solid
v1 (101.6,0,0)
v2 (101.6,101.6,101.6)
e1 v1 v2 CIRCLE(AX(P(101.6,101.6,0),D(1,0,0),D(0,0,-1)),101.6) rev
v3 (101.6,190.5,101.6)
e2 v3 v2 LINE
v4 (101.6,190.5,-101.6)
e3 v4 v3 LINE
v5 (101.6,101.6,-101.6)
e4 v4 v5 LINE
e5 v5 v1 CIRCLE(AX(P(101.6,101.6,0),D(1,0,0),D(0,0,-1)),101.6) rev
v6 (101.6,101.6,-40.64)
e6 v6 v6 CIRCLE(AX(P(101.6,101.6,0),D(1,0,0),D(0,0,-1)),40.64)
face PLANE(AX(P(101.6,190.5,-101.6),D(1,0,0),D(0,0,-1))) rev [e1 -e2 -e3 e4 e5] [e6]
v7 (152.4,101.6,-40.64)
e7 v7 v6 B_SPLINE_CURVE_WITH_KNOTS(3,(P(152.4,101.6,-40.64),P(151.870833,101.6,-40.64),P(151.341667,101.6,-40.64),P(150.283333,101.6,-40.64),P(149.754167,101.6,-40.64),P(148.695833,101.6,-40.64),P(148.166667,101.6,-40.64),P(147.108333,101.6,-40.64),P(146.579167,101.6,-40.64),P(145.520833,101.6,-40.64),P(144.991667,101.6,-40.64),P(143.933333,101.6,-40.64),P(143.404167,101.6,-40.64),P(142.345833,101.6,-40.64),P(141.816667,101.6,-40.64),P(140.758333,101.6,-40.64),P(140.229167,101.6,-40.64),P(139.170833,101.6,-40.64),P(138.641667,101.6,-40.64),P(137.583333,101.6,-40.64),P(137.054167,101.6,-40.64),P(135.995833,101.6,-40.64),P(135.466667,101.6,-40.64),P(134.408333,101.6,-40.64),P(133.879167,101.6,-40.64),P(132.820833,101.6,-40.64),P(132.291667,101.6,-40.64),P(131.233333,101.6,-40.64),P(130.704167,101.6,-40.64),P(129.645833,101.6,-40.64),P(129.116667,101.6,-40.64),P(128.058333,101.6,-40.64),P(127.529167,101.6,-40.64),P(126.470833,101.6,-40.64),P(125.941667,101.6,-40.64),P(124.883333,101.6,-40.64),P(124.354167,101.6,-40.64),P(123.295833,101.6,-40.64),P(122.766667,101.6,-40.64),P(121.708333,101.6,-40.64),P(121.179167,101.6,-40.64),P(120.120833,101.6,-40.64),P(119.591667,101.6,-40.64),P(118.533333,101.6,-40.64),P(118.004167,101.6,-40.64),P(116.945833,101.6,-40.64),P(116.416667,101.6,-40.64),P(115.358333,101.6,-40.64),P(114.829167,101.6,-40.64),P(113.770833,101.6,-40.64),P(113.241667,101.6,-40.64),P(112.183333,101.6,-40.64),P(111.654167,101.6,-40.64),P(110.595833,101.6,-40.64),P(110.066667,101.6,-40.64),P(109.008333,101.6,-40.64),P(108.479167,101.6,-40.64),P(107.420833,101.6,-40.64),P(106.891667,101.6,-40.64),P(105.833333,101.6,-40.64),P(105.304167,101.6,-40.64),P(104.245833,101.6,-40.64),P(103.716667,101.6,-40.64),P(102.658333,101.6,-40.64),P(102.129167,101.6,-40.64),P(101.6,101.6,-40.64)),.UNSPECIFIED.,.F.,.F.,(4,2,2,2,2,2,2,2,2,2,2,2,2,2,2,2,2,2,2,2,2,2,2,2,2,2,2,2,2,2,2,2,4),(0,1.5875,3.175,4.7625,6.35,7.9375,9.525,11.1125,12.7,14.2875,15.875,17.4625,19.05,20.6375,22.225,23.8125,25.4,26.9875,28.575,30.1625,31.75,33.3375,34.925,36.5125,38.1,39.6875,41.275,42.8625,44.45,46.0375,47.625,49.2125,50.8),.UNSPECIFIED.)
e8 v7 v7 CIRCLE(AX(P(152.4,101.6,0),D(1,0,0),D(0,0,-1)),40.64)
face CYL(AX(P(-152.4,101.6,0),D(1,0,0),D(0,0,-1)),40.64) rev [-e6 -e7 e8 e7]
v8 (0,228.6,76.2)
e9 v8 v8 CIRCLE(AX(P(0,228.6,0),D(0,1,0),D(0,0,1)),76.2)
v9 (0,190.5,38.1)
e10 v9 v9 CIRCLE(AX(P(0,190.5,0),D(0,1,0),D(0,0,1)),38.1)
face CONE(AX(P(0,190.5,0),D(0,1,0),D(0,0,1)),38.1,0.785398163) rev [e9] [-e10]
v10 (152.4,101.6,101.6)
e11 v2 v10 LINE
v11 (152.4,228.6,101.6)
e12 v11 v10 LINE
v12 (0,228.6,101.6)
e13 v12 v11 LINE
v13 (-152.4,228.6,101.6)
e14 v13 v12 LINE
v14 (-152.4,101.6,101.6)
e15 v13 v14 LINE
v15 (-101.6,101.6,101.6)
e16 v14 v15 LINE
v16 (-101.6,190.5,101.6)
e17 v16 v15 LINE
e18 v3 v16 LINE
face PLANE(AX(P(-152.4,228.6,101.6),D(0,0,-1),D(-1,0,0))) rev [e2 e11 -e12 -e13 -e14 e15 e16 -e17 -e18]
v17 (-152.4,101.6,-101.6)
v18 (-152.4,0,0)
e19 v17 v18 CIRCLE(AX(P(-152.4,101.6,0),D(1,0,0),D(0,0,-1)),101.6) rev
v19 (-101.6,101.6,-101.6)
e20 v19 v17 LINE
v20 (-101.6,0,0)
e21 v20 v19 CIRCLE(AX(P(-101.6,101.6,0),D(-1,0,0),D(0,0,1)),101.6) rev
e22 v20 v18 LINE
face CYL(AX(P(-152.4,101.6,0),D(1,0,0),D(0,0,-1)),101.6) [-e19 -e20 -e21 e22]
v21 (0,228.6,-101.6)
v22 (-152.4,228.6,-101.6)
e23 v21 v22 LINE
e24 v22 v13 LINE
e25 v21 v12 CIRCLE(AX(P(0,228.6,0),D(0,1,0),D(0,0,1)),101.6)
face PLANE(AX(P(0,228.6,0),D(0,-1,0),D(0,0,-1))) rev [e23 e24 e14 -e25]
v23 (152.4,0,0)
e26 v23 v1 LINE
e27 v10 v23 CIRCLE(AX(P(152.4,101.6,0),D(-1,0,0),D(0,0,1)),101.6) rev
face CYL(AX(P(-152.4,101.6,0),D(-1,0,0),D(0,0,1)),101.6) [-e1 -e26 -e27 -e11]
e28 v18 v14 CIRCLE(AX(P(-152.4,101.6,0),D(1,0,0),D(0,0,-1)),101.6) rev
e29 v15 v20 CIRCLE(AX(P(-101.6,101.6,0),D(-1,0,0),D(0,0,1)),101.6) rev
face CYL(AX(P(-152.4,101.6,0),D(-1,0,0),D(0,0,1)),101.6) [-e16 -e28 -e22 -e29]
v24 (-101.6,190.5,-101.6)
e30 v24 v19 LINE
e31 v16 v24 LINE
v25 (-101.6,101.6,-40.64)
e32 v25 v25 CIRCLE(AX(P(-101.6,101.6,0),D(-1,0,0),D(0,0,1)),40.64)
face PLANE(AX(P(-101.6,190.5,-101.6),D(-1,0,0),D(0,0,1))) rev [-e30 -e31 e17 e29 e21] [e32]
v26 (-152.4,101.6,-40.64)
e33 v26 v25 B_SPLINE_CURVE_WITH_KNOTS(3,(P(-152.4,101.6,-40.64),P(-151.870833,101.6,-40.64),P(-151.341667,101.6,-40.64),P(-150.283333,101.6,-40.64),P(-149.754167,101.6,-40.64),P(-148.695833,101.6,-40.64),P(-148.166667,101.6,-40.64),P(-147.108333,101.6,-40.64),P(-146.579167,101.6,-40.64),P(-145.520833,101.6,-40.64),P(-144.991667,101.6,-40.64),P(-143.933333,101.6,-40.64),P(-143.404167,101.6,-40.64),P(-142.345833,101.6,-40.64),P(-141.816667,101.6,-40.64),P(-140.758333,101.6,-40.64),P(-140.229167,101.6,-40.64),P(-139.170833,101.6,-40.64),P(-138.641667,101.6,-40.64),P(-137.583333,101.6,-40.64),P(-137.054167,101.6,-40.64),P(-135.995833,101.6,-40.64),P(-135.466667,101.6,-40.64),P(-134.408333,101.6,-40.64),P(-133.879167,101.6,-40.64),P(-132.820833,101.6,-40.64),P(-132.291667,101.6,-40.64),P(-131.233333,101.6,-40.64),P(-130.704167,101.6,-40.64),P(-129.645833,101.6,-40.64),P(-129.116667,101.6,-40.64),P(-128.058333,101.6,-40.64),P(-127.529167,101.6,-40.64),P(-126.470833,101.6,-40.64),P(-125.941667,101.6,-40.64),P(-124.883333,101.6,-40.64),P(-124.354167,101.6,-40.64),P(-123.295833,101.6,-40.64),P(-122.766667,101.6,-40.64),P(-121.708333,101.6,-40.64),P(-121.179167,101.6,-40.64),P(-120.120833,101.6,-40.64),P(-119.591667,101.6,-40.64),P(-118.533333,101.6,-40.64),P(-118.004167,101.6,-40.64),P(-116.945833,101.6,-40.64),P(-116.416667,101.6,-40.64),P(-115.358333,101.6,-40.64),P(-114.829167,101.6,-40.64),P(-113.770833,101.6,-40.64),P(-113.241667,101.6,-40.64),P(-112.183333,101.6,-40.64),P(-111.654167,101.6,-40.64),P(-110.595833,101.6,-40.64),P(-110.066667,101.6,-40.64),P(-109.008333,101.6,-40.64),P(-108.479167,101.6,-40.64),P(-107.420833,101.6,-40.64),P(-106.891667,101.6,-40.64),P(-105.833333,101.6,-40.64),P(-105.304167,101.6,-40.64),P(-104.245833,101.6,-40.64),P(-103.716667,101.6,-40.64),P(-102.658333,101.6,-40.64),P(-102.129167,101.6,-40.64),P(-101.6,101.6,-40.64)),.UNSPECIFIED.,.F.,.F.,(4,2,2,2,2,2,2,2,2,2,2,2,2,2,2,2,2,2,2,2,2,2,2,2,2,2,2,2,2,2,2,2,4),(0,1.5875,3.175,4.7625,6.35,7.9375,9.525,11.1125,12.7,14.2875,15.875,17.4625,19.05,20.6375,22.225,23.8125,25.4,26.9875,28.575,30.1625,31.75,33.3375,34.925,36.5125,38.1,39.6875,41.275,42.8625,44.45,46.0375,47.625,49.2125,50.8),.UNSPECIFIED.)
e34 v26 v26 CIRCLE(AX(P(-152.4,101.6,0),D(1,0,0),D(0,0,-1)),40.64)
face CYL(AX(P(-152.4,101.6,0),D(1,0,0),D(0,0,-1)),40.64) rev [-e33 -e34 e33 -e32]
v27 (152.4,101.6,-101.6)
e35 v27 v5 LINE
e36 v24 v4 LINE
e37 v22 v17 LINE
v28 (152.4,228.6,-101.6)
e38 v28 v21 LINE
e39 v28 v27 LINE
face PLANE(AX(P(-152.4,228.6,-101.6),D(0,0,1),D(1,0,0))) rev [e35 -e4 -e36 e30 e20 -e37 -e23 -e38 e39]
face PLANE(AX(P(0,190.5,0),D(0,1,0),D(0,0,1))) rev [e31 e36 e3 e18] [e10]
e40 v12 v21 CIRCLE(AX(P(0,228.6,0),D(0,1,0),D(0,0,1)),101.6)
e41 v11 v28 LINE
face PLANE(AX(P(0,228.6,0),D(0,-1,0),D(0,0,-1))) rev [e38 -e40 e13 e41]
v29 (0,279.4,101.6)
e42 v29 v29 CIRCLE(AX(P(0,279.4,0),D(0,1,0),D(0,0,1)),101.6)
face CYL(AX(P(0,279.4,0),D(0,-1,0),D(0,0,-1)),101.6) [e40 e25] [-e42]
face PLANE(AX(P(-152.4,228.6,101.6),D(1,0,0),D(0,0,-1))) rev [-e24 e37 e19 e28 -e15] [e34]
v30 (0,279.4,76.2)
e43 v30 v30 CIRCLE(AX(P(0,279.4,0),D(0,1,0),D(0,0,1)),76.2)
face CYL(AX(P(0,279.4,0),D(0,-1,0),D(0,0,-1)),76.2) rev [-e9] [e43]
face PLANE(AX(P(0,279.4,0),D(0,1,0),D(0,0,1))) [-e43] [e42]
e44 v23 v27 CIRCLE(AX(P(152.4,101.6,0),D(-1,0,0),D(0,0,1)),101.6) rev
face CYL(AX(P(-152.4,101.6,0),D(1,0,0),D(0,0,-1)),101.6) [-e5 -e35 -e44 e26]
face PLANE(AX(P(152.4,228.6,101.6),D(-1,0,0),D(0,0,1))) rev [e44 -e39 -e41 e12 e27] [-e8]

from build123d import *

# Parameters (mm, degrees)
SKETCH1_W           = 304.8
SKETCH1_H           = 203.2
BOSS_EXTRUDE1_DEPTH = 228.6
SKETCH2_R           = 101.6
SKETCH2_R_2         = 76.2
BOSS_EXTRUDE2_DEPTH = 50.8
SKETCH3_R           = 38.1
CUT_EXTRUDE1_DEPTH  = 38.1
SKETCH4_W           = 203.2
SKETCH4_H           = 203.2
CUT_EXTRUDE2_DEPTH  = 190.5
SKETCH5_R           = 40.64
CUT_EXTRUDE3_DEPTH  = 304.8
FILLET1_R           = 101.6
CHAMFER1_SIZE       = 38.1


with BuildPart() as part:
    # Sketch1 → Boss-Extrude1 (new body)
    with BuildSketch(Plane(origin=(0, 0, 0), x_dir=(1, 0, 0), z_dir=(0, 1, 0))):
        Rectangle(SKETCH1_W, SKETCH1_H)
    extrude(amount=BOSS_EXTRUDE1_DEPTH)

    # Sketch2 → Boss-Extrude2 (add)
    with BuildSketch(Plane(origin=(0, 228.6, 0), x_dir=(1, 0, 0), z_dir=(0, 1, 0))):
        with Locations(Location((0, 0, 0), (0, 0, 270))):
            Circle(SKETCH2_R)
        with Locations(Location((0, 0, 0), (0, 0, 270))):
            Circle(SKETCH2_R_2, mode=Mode.SUBTRACT)
    extrude(amount=BOSS_EXTRUDE2_DEPTH)

    # Sketch3 → Cut-Extrude1 (cut)
    with BuildSketch(Plane(origin=(0, 228.6, 0), x_dir=(1, 0, 0), z_dir=(0, 1, 0))):
        with Locations(Location((0, 0, 0), (0, 0, 270))):
            Circle(SKETCH3_R)
    extrude(amount=-CUT_EXTRUDE1_DEPTH, mode=Mode.SUBTRACT)

    # Sketch4 → Cut-Extrude2 (cut)
    with BuildSketch(Plane.XZ):
        Rectangle(SKETCH4_W, SKETCH4_H)
    extrude(amount=-CUT_EXTRUDE2_DEPTH, mode=Mode.SUBTRACT)

    # Sketch5 → Cut-Extrude3 (cut)
    with BuildSketch(Plane(origin=(152.4, 0, 0), x_dir=(0, 0, -1), z_dir=(1, 0, 0))):
        with Locations((0, 101.6)):
            Circle(SKETCH5_R)
    extrude(amount=-CUT_EXTRUDE3_DEPTH, mode=Mode.SUBTRACT)

    # Fillet1
    fillet1_edges = [part.edges().sort_by_distance(p)[0] for p in [
        (127, 0, -101.6),
        (127, 0, 101.6),
        (-127, 0, -101.6),
        (-127, 0, 101.6),
    ]]
    fillet(fillet1_edges, radius=FILLET1_R - 0.0001)  # a hair under: the kernel refuses the full size

    # Chamfer1
    chamfer1_edges = [part.edges().sort_by_distance(p)[0] for p in [
        (0, 228.6, -38.1),
    ]]
    chamfer(chamfer1_edges, length=CHAMFER1_SIZE - 0.0001)  # a hair under: the kernel refuses the full size


solid = part.part
